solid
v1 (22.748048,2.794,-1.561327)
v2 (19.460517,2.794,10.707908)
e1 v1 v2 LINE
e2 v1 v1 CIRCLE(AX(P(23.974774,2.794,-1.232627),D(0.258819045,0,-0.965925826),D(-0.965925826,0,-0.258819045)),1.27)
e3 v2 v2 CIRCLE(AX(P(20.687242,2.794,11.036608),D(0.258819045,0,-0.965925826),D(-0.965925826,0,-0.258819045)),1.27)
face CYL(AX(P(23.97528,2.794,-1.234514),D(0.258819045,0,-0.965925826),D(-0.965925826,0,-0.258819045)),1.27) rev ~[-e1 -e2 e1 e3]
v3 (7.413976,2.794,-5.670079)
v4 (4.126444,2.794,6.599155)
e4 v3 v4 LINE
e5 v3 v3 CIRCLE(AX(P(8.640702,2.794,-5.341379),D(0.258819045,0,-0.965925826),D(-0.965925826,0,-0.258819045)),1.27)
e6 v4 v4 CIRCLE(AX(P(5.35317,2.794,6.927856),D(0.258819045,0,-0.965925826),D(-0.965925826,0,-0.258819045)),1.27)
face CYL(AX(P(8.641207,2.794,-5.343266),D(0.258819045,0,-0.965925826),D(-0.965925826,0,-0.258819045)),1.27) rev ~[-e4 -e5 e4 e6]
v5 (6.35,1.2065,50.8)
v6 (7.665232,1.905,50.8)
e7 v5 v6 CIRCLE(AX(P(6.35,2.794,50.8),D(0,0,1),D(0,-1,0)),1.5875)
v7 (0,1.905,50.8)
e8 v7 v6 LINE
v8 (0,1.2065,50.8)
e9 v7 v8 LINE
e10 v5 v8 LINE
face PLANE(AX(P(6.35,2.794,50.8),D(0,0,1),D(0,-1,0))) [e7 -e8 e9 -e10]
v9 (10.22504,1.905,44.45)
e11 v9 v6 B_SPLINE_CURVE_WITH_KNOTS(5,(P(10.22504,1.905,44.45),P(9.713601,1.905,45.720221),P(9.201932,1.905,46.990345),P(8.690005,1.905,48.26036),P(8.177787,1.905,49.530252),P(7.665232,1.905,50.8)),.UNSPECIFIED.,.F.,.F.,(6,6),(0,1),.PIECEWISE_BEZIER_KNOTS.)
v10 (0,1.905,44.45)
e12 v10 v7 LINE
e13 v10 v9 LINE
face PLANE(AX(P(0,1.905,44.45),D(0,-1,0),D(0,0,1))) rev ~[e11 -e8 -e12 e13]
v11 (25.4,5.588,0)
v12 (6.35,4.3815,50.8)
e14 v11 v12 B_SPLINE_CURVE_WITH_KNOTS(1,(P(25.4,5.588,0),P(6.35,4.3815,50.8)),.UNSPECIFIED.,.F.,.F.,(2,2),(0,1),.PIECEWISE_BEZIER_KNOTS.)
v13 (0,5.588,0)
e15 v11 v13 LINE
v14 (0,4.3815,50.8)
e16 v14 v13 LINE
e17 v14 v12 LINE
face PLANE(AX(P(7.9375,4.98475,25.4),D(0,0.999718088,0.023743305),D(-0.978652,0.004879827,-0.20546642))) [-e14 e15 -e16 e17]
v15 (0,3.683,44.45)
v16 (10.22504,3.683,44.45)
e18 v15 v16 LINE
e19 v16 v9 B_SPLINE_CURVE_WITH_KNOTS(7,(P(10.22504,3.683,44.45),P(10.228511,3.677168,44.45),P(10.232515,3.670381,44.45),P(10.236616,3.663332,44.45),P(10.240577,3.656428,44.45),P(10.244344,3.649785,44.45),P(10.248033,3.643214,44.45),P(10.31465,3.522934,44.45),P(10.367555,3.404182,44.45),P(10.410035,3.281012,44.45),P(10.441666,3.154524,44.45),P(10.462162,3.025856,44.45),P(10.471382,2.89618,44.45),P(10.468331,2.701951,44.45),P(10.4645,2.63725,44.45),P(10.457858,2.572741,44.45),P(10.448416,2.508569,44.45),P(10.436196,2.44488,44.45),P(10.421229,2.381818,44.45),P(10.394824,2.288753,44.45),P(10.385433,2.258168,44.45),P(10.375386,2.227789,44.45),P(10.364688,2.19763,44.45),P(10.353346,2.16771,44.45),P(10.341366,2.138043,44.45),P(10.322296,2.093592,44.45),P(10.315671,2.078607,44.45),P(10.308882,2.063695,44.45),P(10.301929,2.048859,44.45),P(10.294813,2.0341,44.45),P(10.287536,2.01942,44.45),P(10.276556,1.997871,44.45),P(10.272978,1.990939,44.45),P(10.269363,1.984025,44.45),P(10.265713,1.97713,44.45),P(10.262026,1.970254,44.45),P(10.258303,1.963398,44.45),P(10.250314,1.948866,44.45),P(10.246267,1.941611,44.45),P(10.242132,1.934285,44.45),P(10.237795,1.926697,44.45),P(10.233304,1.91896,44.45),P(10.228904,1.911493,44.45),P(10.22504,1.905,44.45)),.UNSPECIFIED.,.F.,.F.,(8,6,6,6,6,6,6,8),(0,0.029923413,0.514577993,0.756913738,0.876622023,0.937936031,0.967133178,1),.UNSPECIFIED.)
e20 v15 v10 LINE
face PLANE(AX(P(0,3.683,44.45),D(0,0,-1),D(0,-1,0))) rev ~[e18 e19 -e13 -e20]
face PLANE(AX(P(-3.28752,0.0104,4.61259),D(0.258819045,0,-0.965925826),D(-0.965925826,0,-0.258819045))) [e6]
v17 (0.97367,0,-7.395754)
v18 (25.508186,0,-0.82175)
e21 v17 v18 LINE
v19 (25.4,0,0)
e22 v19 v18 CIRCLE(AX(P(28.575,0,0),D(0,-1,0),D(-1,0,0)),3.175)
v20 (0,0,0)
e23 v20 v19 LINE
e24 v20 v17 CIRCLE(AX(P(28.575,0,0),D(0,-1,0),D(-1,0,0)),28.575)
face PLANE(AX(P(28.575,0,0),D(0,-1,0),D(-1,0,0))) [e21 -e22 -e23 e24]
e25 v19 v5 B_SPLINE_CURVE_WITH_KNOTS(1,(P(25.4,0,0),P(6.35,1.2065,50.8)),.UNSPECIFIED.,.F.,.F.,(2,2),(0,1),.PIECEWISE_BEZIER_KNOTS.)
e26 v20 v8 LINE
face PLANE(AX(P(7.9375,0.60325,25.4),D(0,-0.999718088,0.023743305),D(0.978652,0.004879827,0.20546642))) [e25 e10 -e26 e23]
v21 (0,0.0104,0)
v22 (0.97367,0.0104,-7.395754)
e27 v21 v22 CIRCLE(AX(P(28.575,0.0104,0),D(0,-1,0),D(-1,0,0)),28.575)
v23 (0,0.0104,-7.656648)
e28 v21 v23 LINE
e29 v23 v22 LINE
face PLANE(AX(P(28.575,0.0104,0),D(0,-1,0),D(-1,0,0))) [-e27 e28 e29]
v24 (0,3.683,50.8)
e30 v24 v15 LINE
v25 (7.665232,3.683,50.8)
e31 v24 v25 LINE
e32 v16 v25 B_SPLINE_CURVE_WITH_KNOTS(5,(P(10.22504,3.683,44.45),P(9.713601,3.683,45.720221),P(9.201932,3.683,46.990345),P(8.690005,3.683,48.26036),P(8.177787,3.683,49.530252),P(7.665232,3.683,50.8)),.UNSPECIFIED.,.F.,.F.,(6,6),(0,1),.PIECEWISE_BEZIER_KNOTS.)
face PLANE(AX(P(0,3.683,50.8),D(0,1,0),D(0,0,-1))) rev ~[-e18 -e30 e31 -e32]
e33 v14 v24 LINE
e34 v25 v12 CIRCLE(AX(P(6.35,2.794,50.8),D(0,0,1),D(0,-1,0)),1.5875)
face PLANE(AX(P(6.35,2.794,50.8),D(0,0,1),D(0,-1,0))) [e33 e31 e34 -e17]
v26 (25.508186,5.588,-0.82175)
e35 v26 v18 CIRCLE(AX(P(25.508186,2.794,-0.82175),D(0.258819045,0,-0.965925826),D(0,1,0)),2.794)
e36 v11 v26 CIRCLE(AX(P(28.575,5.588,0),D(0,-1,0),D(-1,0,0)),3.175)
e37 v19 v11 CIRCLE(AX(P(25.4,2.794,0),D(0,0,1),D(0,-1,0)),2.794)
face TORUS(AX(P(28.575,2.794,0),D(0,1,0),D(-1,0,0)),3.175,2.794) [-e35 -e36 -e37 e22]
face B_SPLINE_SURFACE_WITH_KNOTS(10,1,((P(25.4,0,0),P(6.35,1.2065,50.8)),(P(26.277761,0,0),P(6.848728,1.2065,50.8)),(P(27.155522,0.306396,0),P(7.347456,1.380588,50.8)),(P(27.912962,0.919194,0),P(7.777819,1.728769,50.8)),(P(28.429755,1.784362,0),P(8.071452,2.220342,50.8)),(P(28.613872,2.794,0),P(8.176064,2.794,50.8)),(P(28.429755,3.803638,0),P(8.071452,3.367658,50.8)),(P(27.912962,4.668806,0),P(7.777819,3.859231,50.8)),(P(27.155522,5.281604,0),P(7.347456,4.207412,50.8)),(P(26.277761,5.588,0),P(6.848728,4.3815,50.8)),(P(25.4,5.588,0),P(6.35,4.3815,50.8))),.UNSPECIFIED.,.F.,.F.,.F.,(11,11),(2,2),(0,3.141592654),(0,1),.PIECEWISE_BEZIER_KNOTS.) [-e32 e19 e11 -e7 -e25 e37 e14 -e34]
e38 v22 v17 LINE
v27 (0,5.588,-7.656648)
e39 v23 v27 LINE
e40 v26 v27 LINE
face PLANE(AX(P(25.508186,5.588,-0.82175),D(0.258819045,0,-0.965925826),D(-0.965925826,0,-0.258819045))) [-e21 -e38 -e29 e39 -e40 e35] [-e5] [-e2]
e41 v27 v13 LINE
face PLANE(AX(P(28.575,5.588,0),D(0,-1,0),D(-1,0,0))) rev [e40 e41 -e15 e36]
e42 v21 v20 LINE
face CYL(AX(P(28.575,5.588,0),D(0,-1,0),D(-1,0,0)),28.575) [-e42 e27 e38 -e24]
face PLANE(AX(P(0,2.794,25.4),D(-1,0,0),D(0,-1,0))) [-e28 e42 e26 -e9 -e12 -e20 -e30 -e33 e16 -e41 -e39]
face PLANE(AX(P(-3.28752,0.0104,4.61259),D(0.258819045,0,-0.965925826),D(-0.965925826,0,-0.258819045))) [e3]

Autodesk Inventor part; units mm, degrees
ref_plane "YZ Plane" through (0, 0, 0) normal (1, 0, 0) x (0, 1, 0)
ref_plane "XZ Plane" through (0, 0, 0) normal (0, 1, 0) x (-1, 0, 0)
sketch "Sketch2" plane through (0, 0, 0) normal (0, 0, 1) x (1, 0, 0)
  line L0 (0, 0) -> (25.4, 0)
  line L1 (25.4, 0) -> (25.4, 5.588)
  line L2 (25.4, 5.588) -> (0, 5.588)
  line L3 (0, 5.588) -> (0, 0)
  arc A0 (25.4, 0) -> (25.4, 5.588) centre (25.4, 2.794) ccw
  dimension "d0" = 25.4
  dimension "d1" = 5.588
ref_plane "Work Plane1" through (0, 0, 50.8) normal (0, 0, 1) x (1, 0, 0)
sketch "Sketch3" plane through (0, 0, 50.8) normal (0, 0, 1) x (1, 0, 0)
  line L0 (0, 1.2065) -> (6.35, 1.2065)
  line L1 (6.35, 1.2065) -> (6.35, 4.3815)
  line L2 (6.35, 4.3815) -> (0, 4.3815)
  line L3 (0, 4.3815) -> (0, 1.2065)
  arc A0 (6.35, 1.2065) -> (6.35, 4.3815) centre (6.35, 2.794) ccw
  point P0 (0, 0)
  dimension "d3" = 6.35
  dimension "d4" = 3.175
  dimension "d5" = 1.2065
loft "Loft1" add profiles "Sketch2", "Sketch3"
sketch "Sketch4" plane through (0, 0, 0) normal (-1, 0, 0) x (0, 0, 1)
  line L0 (0, 5.588) -> (0, 0) projected
  line L1 (0, 0) -> (50.8, 1.2065) projected
  line L2 (50.8, 4.3815) -> (50.8, 1.2065) projected
  line L3 (0, 5.588) -> (50.8, 4.3815) projected
  line L4 (0, 5.588) -> (50.8, 4.3815) projected
  line L5 (44.45, 4.5323) -> (44.45, 1.0557)
  line L6 (50.8, 1.2065) -> (0, 0) projected
  dimension "d10" = 6.35
extrude "Extrusion1" add sketch "Sketch4" along normal blind 38.608 contours L3 L2 L1 L5
sketch "Sketch5" plane through (25.4, 5.588, 0) normal (0, 0, -1) x (-1, 0, 0)
  line L0 (25.4, 0) -> (25.4, -5.588) projected
  line L1 (0, 0) -> (25.4, 0) projected
  arc A0 (0, 0) -> (0, -5.588) centre (0, -2.794) ccw projected
  line L2 (25.4, -5.588) -> (0, -5.588) projected
  line L3 (25.4, 0) -> (25.4, -5.588) projected
  line L4 (25.4, 0) -> (36.1487, 0)
  line L5 (36.1487, 0) -> (36.1487, -5.5776)
  line L6 (36.1487, -5.5776) -> (25.4, -5.5776)
  line L7 (25.4, -5.5776) -> (25.4, 0)
  line L8 (-3.175, -0.1076) -> (-3.175, -7.007)
  line L9 (25.4, -5.588) -> (0, -5.588) projected
revolve "Revolution1" add sketch "Sketch5" angle 15 about axis through (28.575, 5.4804, 0) along (0, -1, 0)
sketch "Sketch7" plane through (-10.7487, 5.588, 0) normal (0, 1, 0) x (1, 0, 0)
  line L0 (0, 0) -> (10.7487, 0) projected
  line L1 (36.1487, 0) -> (10.7487, 0) projected
  arc A0 (36.2569, 0.8218) -> (36.1487, 0) centre (39.3237, 0) ccw projected
  line L2 (1.3399, 10.1777) -> (36.2569, 0.8218) projected
  arc A1 (1.3399, 10.1777) -> (0, 0) centre (39.3237, 0) ccw projected
  line L3 (10.7487, 0) -> (10.7487, -44.45) projected
  line L4 (10.7487, 0) -> (-2.0556, 0)
  line L5 (-2.0556, 0) -> (-2.0556, 10.6947)
  line L6 (-2.0556, 10.6947) -> (10.7487, 10.6947)
  line L7 (10.7487, 10.6947) -> (10.7487, 0)
extrude "Extrusion2" cut sketch "Sketch7" against normal blind 38.1 contours A1 L2 L7 L0 | L4 L5 L6 L7 L2 A1
sketch "Sketch8" plane through (0, 0.0104, -7.6566) normal (0.258819, 0, -0.9659258) x (-0.9659258, 0, -0.258819)
  line L0 (-29.583, 2.7836) -> (-24.8205, 2.7836)
  line L1 (-24.8205, 2.7836) -> (-8.9455, 2.7836)
  circle A0 centre (-24.8205, 2.7836) radius 1.27
  circle A1 centre (-8.9455, 2.7836) radius 1.27
  line L2 (-26.408, -0.0104) -> (0, -0.0104) projected
  point P0 (-1.9817, -0.0104)
  point P1 (0, 0)
  dimension "d17" = 4.7625
  dimension "d18" = 15.875
  dimension "d19" = 2.54
  dimension "d20" = 2.54
  dimension "d23" = 2.794
extrude "Extrusion4" cut sketch "Sketch8" against normal blind 12.7
sketch "Sketch9" plane through (0, 1.0557, 44.45) normal (0, 0, -1) x (-1, 0, 0)
  line L0 (0, 0) -> (0, 3.4766) projected
  line L1 (0, 0) -> (38.608, 0) projected
  line L2 (38.608, 3.4766) -> (38.608, 0) projected
  line L3 (0, 3.4766) -> (38.608, 3.4766) projected
  point P0 (0, -1.0557)
extrude "Extrusion5" cut sketch "Sketch9" against normal through all
sketch "Sketch10" plane through (0, 1.2065, 50.8) normal (-1, 0, 0) x (0, 0, 1)
  line L0 (0, 3.175) -> (0, 0) projected
  line L1 (0, 2.4765) -> (-6.35, 2.4765)
  line L2 (-6.35, 2.4765) -> (-6.35, 0.6985)
  line L3 (-6.35, 0.6985) -> (0, 0.6985)
  line L4 (0, 0.6985) -> (0, 2.4765)
  line L5 (-50.8, 4.3815) -> (0, 3.175) construction
  line L6 (0, 2.4765) -> (0, 3.175) construction
  line L7 (0, 3.175) -> (0, 0) construction
  line L8 (0, 0.6985) -> (0, 0) construction
  point P0 (-50.8, -1.2065)
  dimension "d28" = 1.778
  dimension "d29" = 6.35
extrude "Extrusion6" cut sketch "Sketch10" against normal through all
properties part number "DivePlanesStabilizingFins_Print1"
